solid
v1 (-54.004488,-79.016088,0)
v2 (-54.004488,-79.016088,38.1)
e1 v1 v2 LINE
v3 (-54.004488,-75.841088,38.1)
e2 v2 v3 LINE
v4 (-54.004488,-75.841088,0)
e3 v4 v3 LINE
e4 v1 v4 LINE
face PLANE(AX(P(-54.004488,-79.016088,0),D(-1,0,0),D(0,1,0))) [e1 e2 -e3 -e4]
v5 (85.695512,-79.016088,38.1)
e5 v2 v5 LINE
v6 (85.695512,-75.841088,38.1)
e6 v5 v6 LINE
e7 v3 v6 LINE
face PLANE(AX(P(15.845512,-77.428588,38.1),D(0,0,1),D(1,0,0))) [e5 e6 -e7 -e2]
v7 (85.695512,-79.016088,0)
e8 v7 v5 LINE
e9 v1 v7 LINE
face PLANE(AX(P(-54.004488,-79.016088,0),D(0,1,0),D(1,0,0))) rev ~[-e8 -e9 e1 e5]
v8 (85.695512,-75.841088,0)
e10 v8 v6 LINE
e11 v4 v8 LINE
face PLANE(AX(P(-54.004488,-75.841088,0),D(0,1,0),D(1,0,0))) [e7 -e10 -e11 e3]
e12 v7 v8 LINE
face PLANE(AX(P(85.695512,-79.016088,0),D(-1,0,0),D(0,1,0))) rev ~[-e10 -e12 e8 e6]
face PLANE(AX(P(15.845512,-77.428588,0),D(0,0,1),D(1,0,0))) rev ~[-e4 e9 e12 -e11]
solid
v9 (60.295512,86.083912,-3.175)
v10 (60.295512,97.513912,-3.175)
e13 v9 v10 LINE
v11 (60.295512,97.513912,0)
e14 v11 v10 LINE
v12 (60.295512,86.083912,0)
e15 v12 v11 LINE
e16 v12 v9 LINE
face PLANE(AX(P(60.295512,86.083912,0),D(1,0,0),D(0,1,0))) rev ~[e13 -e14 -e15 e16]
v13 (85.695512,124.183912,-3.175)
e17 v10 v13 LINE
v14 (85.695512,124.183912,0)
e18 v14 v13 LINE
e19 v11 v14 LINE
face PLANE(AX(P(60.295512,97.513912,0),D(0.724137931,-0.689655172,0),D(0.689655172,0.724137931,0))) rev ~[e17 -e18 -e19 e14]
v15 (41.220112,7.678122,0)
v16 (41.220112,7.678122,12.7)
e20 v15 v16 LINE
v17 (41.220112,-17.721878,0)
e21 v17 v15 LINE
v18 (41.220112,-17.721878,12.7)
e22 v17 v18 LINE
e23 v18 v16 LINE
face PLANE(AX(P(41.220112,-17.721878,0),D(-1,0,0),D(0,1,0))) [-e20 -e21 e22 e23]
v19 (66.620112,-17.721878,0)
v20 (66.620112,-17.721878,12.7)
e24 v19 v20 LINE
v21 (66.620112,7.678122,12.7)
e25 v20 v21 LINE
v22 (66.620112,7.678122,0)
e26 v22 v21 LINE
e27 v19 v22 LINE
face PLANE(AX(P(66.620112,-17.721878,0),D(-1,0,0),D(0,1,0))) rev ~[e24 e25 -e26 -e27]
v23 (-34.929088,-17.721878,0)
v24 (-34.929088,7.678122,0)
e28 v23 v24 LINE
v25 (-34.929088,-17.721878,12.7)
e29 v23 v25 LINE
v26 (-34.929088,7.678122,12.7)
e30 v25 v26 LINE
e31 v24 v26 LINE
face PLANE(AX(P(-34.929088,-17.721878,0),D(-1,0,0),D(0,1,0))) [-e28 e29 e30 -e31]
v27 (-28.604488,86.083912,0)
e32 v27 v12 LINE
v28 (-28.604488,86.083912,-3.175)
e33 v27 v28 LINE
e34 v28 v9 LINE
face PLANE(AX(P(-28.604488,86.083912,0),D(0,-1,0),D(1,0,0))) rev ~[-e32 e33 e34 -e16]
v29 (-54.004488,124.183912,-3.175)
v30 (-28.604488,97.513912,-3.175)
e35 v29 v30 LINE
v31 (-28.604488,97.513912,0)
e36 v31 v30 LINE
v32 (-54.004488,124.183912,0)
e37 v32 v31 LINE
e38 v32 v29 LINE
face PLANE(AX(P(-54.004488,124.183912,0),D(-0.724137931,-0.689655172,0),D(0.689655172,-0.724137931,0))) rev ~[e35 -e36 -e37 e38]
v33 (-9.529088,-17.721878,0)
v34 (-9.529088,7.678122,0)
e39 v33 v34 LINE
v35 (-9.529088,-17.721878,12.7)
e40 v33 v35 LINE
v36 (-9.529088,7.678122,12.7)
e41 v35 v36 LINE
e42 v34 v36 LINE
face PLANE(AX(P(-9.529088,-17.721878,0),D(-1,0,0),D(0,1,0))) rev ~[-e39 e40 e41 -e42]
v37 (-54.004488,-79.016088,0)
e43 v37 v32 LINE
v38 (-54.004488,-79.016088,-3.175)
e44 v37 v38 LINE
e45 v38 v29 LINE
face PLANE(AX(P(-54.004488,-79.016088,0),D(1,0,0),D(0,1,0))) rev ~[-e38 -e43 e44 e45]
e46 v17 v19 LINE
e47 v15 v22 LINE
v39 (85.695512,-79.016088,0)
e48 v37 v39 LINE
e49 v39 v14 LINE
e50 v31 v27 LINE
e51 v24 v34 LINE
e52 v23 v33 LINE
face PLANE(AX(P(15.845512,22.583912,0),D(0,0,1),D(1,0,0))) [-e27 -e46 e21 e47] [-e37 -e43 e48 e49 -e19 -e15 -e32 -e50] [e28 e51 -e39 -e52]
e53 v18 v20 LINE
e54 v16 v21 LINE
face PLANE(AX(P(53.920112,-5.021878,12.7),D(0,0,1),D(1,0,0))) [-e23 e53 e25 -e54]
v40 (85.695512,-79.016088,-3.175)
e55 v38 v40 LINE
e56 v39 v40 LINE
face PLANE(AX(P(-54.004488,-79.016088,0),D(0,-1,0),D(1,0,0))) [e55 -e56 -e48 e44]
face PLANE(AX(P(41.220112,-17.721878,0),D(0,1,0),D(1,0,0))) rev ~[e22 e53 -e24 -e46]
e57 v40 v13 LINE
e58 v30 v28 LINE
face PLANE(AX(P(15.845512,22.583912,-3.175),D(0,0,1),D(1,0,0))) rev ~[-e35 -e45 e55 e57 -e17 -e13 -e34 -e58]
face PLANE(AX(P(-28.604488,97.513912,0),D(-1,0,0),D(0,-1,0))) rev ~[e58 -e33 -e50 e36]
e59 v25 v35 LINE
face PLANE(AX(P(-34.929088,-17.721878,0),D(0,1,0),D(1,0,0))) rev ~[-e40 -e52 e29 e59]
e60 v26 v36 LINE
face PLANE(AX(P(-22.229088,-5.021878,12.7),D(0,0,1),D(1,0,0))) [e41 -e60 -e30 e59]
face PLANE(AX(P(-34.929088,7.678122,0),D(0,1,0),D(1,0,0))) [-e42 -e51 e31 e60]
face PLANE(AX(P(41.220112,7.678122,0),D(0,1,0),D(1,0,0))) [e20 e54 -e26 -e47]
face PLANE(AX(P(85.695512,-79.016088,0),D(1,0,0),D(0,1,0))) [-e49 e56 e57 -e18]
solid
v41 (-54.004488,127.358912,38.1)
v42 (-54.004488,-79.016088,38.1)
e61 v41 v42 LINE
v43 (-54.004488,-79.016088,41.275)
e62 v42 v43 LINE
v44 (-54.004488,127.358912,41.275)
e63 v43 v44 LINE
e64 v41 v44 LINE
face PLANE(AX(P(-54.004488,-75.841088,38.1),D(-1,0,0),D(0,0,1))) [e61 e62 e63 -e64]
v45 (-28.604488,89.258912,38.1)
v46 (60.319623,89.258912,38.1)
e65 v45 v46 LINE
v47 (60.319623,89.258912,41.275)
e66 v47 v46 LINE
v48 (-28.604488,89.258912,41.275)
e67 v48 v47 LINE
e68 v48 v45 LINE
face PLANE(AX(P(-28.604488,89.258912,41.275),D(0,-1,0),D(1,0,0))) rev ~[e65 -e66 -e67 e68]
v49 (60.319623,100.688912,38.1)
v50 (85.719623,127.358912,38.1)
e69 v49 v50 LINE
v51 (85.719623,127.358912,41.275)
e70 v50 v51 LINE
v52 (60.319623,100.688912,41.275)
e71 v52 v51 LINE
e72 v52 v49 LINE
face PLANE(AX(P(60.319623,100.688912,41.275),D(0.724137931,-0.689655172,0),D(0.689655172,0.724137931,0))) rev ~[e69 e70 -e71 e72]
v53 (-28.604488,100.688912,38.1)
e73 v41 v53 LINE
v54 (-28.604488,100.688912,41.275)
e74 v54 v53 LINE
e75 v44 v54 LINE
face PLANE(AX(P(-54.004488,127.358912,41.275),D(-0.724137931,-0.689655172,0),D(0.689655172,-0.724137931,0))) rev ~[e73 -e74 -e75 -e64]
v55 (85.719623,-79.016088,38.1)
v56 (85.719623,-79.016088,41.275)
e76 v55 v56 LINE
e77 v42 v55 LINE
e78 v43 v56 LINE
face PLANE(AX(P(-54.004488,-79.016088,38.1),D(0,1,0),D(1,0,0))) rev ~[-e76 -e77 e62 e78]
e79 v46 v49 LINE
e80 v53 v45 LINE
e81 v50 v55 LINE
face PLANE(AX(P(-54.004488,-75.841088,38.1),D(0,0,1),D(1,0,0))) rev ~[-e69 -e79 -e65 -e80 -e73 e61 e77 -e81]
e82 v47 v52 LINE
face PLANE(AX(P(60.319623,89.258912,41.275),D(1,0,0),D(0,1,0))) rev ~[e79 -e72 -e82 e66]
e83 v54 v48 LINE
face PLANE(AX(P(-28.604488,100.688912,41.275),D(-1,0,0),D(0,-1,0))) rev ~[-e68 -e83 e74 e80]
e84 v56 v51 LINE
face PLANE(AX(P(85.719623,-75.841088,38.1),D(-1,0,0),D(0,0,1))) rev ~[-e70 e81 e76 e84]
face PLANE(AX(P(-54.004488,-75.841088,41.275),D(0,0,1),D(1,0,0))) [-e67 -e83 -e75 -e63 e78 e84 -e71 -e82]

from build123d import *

# Parameters (mm, degrees)
F0_W      = 139.7
F0_H      = 203.2
F1_DEPTH  = 3.175
F3_DEPTH  = 3.175
F4_W      = 25.4
F4_H      = 25.4
F5_DEPTH  = 12.7
F6_W      = 139.7
F6_H      = 3.175
F7_DEPTH  = 38.1
F8_W      = 139.7241105051
F8_H      = 203.2
F9_DEPTH  = 3.175
F11_DEPTH = 25.4
F12_DEPTH = 3.175


# Not quite as in the source:
# - a length typed as a fraction of an inch, garbled in the dataset ("3 / 203.2 mm" for 3/8 in), is restored
# - a feature names something its author has since deleted; it is built from what else it names


with BuildPart() as f1:
    # F0 (on Top) → F1 (new body)
    with BuildSketch(Plane.XY):
        with Locations((15.8455121665, 22.5839115024)):
            Rectangle(F0_W, F0_H)
    extrude(amount=-F1_DEPTH)

    # F2 (on face) → F3 (cut)
    with BuildSketch(Plane.XY):
        Polygon((-28.6044878335, 97.5139115024), (-28.6044878335, 86.0839115024), (60.2955121665, 86.0839115024), (60.2955121665, 97.5139115024), (85.6955121665, 124.1839115024), (-54.0044878335, 124.1839115024), align=None)
    extrude(amount=-F3_DEPTH, mode=Mode.SUBTRACT)

    # F4 (on face) → F5 (join)
    with BuildSketch(Plane.XY):
        with Locations((-22.2290878335, -5.0218783647)):
            Rectangle(F4_W, F4_H)
        with Locations((53.9201121665, -5.0218783647)):
            Rectangle(F4_W, F4_H)
    extrude(amount=F5_DEPTH)


with BuildPart() as f7:
    # F6 (on face) → F7 (new body)
    with BuildSketch(Plane.XY):
        with Locations((15.8455121665, -77.4285884976)):
            Rectangle(F6_W, F6_H)
    extrude(amount=F7_DEPTH)


with BuildPart() as f9:
    # F8 (on face) → F9 (new body)
    with BuildSketch(Plane.XY.offset(38.1)):
        with Locations((15.8575674191, 25.7589115024)):
            Rectangle(F8_W, F8_H)
    extrude(amount=F9_DEPTH)

    # F10 (on face) → F11 (cut)
    with BuildSketch(Plane.XY.offset(41.275)):
        Polygon((-28.6044878335, 100.6889115024), (-28.6044878335, 89.2589115024), (60.3196226716, 89.2589115024), (60.3196226716, 100.6889115024), (85.7196226716, 127.3589115024), (-54.0044878335, 127.3589115024), align=None)
    extrude(amount=-F11_DEPTH, mode=Mode.SUBTRACT)

    # F12 (add): a face of the model
    f12_faces = [f9.faces().sort_by_distance(p)[0] for p in [
        (15.8575674191, -75.8410884976, 39.6875),
    ]]
    extrude(f12_faces, amount=F12_DEPTH)


solid = Compound([f1.part, f7.part, f9.part])
